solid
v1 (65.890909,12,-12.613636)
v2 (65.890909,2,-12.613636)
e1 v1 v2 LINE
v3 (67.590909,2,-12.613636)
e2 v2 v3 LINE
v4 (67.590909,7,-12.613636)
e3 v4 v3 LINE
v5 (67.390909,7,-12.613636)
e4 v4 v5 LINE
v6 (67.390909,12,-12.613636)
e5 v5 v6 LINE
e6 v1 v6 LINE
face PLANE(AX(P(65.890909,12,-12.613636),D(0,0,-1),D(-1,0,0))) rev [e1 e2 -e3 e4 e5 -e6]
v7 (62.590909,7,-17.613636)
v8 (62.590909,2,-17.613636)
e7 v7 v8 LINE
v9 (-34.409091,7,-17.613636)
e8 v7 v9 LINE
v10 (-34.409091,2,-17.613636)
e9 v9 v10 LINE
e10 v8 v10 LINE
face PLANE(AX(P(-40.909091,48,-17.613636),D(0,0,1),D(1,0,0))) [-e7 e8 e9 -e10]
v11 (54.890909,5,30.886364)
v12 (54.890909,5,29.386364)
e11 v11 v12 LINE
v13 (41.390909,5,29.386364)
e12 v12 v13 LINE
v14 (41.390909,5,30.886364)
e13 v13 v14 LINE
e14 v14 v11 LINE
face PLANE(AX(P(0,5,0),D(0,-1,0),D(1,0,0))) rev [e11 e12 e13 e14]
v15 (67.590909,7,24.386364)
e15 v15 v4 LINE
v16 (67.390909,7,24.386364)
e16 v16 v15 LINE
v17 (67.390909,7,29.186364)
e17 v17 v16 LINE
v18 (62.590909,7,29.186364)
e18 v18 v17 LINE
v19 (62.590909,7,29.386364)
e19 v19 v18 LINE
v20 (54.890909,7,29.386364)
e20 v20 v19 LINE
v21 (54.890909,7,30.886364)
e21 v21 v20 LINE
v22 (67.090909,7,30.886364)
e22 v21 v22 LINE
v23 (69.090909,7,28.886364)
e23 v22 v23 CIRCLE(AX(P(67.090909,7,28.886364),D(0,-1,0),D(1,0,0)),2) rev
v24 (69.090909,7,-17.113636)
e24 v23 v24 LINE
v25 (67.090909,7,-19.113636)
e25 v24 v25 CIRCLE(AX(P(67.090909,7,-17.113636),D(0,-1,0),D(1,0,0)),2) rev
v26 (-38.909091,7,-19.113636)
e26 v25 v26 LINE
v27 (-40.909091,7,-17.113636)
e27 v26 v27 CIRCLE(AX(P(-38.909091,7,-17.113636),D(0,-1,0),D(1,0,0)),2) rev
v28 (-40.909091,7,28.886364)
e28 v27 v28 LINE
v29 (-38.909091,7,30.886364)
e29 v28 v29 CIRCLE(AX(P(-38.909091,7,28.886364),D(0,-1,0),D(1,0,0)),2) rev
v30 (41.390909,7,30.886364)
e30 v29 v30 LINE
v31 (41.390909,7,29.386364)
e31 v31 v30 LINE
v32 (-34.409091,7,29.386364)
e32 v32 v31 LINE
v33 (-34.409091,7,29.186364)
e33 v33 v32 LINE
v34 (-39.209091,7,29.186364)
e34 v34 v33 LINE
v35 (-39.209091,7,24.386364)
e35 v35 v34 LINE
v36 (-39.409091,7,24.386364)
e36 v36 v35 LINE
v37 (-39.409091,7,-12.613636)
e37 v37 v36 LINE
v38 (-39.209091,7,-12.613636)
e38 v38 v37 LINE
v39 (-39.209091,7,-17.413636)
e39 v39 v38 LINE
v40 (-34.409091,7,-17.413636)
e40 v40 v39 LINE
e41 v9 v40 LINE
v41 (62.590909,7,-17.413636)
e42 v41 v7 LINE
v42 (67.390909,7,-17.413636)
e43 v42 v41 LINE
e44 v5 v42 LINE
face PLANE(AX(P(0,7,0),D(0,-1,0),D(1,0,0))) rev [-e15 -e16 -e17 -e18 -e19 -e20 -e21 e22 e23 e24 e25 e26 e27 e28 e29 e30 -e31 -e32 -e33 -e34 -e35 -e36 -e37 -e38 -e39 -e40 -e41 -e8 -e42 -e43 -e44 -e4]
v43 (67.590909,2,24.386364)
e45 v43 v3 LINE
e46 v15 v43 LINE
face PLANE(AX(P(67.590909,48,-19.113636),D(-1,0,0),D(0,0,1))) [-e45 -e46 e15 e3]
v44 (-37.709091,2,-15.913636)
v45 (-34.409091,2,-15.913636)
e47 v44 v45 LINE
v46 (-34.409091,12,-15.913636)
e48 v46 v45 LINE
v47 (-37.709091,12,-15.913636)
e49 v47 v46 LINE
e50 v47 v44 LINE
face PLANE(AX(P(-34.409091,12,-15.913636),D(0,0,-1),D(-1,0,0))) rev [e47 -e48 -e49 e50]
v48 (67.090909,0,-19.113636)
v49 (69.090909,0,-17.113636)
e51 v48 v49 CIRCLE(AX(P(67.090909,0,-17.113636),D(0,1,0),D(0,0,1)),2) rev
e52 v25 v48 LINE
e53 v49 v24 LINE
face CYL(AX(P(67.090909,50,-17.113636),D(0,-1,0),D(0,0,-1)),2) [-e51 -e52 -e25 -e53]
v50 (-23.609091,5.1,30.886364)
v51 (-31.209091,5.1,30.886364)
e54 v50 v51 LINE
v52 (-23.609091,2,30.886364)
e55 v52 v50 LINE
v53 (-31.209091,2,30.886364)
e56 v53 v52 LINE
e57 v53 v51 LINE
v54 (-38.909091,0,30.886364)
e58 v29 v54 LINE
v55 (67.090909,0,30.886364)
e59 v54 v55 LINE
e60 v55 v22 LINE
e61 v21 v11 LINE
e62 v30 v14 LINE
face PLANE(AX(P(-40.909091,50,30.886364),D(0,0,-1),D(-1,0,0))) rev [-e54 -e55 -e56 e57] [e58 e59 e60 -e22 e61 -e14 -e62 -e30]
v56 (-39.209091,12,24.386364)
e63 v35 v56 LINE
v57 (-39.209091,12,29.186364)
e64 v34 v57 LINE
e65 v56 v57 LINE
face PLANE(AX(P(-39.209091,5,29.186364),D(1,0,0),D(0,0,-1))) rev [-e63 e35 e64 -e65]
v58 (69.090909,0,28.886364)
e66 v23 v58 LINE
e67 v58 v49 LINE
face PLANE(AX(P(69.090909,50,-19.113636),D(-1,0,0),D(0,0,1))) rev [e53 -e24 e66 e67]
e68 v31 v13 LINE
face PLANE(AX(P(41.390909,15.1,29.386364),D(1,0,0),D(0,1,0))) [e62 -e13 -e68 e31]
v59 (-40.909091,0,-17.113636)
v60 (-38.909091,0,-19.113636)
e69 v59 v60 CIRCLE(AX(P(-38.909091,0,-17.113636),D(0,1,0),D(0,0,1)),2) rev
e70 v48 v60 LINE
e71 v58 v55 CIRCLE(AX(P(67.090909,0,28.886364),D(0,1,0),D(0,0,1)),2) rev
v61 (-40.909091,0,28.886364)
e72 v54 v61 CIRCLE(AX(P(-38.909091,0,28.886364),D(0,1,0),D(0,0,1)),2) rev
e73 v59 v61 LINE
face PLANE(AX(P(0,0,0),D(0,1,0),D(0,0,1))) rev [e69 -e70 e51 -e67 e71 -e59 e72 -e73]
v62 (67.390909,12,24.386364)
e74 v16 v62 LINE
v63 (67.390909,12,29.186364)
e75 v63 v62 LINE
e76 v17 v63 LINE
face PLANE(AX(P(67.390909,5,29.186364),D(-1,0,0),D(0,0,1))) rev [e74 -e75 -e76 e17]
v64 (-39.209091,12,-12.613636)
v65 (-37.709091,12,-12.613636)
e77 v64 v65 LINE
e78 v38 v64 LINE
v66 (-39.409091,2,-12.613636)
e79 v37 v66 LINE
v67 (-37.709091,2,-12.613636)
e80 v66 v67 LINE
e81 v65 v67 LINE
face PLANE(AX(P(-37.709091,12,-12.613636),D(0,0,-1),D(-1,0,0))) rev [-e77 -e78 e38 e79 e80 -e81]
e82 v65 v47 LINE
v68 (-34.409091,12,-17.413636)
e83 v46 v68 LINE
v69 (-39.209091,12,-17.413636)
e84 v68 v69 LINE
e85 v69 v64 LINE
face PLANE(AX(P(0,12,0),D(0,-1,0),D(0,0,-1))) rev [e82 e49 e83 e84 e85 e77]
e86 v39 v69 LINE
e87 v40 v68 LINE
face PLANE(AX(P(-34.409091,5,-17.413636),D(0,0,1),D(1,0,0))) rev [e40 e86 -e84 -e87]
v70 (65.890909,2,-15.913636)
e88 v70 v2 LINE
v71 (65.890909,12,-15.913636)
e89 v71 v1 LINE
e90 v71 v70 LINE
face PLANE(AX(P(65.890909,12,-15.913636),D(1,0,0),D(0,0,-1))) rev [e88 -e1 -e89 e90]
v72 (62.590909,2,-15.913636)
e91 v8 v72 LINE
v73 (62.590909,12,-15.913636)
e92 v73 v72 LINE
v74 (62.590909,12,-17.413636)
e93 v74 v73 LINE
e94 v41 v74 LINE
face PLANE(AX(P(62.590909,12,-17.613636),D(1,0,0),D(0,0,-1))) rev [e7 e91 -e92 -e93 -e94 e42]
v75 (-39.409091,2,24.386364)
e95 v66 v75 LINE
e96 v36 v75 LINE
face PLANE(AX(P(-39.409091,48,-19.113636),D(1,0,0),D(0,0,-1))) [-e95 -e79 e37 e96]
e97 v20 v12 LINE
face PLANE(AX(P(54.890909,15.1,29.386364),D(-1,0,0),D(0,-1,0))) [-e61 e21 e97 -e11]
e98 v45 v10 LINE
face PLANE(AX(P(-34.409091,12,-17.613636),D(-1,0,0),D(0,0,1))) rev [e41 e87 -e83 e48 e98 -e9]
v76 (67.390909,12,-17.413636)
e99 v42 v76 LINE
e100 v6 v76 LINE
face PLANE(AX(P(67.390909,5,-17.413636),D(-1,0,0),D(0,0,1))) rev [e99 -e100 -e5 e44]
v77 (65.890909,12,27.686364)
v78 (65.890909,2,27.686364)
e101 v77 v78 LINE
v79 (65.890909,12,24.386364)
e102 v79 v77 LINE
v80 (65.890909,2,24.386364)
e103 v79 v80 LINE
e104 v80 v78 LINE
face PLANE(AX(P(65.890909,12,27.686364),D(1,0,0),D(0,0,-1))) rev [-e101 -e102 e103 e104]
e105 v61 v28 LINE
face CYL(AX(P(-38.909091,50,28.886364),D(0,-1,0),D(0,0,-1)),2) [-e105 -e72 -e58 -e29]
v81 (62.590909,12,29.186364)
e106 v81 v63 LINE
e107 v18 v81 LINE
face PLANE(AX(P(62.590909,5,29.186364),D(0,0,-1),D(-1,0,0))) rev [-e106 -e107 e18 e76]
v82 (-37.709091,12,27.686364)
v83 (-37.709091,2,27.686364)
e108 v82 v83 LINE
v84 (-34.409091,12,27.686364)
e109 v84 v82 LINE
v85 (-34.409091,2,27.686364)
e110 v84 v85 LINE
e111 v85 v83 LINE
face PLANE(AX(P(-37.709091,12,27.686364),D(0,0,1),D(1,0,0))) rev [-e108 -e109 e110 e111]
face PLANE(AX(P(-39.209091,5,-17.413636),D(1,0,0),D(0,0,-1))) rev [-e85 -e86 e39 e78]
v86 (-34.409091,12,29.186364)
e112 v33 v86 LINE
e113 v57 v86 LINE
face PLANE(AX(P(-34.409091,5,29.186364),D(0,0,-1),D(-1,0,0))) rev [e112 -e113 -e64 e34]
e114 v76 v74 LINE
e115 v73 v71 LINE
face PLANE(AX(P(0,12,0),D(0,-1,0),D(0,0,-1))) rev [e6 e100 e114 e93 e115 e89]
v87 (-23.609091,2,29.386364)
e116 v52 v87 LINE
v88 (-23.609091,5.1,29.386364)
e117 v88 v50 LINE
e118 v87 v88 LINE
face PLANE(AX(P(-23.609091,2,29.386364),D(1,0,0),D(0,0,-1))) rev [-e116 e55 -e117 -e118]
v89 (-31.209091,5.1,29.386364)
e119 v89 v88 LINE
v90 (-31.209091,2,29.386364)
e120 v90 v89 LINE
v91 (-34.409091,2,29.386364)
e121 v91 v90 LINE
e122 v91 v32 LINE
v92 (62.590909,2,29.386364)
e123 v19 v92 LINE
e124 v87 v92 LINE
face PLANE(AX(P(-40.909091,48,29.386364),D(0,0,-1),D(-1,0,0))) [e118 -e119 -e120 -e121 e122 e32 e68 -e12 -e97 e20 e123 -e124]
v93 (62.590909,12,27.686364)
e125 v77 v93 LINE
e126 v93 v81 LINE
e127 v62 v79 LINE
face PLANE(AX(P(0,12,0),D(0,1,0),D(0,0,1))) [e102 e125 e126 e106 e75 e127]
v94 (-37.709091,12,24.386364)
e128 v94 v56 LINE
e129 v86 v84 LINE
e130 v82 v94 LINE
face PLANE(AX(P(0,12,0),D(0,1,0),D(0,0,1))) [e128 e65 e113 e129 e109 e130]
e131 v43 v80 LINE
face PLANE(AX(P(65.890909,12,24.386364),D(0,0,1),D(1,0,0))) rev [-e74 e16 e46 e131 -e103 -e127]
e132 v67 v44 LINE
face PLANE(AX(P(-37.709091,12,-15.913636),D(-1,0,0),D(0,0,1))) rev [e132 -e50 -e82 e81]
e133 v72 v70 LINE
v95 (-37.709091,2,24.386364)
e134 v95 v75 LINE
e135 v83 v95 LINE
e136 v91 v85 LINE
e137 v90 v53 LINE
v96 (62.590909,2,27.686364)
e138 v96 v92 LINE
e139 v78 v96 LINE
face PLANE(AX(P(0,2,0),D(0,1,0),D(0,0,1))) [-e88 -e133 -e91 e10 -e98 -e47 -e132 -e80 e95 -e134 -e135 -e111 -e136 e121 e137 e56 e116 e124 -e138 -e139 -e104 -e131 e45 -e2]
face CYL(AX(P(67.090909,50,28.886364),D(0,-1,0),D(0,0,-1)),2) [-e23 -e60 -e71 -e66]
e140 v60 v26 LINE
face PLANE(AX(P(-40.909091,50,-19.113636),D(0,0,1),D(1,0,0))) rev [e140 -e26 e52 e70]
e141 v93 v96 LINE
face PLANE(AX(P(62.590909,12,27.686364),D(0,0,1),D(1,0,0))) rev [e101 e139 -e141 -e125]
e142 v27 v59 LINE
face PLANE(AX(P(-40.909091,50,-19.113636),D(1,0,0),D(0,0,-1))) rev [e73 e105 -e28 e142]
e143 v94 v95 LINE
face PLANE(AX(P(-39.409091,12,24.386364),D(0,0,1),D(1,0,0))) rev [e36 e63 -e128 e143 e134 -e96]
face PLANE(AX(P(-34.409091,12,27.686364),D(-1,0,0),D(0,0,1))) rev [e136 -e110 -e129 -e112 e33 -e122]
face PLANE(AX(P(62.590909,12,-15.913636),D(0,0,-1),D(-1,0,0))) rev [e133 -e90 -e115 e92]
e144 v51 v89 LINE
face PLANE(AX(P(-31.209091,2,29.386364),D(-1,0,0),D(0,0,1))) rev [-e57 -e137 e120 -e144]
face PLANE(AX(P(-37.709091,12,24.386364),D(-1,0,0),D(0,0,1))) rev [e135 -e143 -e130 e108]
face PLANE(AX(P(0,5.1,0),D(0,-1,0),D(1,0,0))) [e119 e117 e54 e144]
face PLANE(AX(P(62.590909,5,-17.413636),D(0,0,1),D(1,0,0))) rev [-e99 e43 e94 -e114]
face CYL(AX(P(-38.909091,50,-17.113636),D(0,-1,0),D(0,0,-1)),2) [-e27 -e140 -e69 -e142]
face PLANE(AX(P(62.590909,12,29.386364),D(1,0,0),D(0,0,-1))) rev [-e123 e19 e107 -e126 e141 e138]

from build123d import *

# Parameters (mm, degrees)
STOCK_FULL_SHAPE_1_OUTLINE_W     = 110
STOCK_FULL_SHAPE_1_OUTLINE_H     = 50
STOCK_FULL_SHAPE_1_DEPTH         = 2
STOCK_FULL_START                 = 2
STOCK_FULL_SHAPE_1_2_OUTLINE_W   = 110
STOCK_FULL_SHAPE_1_2_OUTLINE_H   = 50
STOCK_FULL_SHAPE_1_2_OUTLINE_W_2 = 107
STOCK_FULL_SHAPE_1_2_OUTLINE_H_2 = 47
STOCK_FULL_SHAPE_1_2_DEPTH       = 3
BOSS_EXTRUDE1_DEPTH              = 10
BOSS_EXTRUDE2_DEPTH              = 10
BOSS_EXTRUDE3_DEPTH              = 10
BOSS_EXTRUDE4_DEPTH              = 10
CUT_EXTRUDE3_DEPTH               = 7
SKETCH9_W                        = 106.6
SKETCH9_H                        = 2
CUT_EXTRUDE4_DEPTH               = 87
SKETCH10_W                       = 7.6
SKETCH10_H                       = 1.5
CUT_EXTRUDE5_DEPTH               = 3
SKETCH11_W                       = 110
SKETCH11_H                       = 50
BOSS_EXTRUDE5_DEPTH              = 2
BOSS_EXTRUDE6_DEPTH              = 2
SKETCH13_W                       = 7.6
SKETCH13_H                       = 1.5
CUT_EXTRUDE6_DEPTH               = 0.1
SKETCH1_W                        = 13.5
SKETCH1_H                        = 1.5
CUT_EXTRUDE7_DEPTH               = 10.1
FILLET1_R                        = 2


# Read off the part's stored shape, not the designer's step: Stock-full shape-1
with BuildPart() as part:
    # Stock-full shape-1 outline → Stock-full shape-1 (new body)
    with BuildSketch(Plane(origin=(0, 0, 0), x_dir=(1, 0, 0), z_dir=(0, 1, 0))):
        with Locations((14.090909091, -5.886363636)):
            Rectangle(STOCK_FULL_SHAPE_1_OUTLINE_W, STOCK_FULL_SHAPE_1_OUTLINE_H)
    extrude(amount=STOCK_FULL_SHAPE_1_DEPTH)

    # Stock-full shape-1 2 outline → Stock-full shape-1 2 (add)
    with BuildSketch(Plane(origin=(0, 0, 0), x_dir=(1, 0, 0), z_dir=(0, 1, 0)).offset(STOCK_FULL_START)):
        with Locations((14.090909091, -5.886363636)):
            Rectangle(STOCK_FULL_SHAPE_1_2_OUTLINE_W, STOCK_FULL_SHAPE_1_2_OUTLINE_H)
        with Locations((14.090909091, -5.886363636)):
            Rectangle(STOCK_FULL_SHAPE_1_2_OUTLINE_W_2, STOCK_FULL_SHAPE_1_2_OUTLINE_H_2, mode=Mode.SUBTRACT)
    extrude(amount=STOCK_FULL_SHAPE_1_2_DEPTH)

    # Sketch4 → Boss-Extrude1 (add)
    with BuildSketch(Plane(origin=(0, 2, 0), x_dir=(1, 0, 0), z_dir=(0, 1, 0))):
        Polygon((-39.409090909, 12.824440082), (-39.409090909, 17.613636364), (-34.409090909, 17.613636364), (-34.409090909, 15.913636364), (-37.709090909, 15.913636364), (-37.709090909, 12.613636364), (-39.409090909, 12.613636364), align=None)
    extrude(amount=BOSS_EXTRUDE1_DEPTH)

    # Sketch5 → Boss-Extrude2 (add)
    with BuildSketch(Plane(origin=(0, 2, 0), x_dir=(1, 0, 0), z_dir=(0, 1, 0))):
        Polygon((-39.409090909, -29.386363636), (-39.409090909, -24.386363636), (-37.709090909, -24.386363636), (-37.709090909, -27.686363636), (-34.409090909, -27.686363636), (-34.409090909, -29.386363636), align=None)
    extrude(amount=BOSS_EXTRUDE2_DEPTH)

    # Sketch6 → Boss-Extrude3 (add)
    with BuildSketch(Plane(origin=(0, 2, 0), x_dir=(1, 0, 0), z_dir=(0, 1, 0))):
        Polygon((67.590909091, 17.613636364), (62.590909091, 17.613636364), (62.590909091, 15.913636364), (65.890909091, 15.913636364), (65.890909091, 12.613636364), (67.590909091, 12.613636364), align=None)
    extrude(amount=BOSS_EXTRUDE3_DEPTH)

    # Sketch7 → Boss-Extrude4 (add)
    with BuildSketch(Plane(origin=(0, 2, 0), x_dir=(1, 0, 0), z_dir=(0, 1, 0))):
        Polygon((67.590909091, -24.386363636), (67.590909091, -29.386363636), (62.590909091, -29.386363636), (62.590909091, -27.686363636), (65.890909091, -27.686363636), (65.890909091, -24.386363636), align=None)
    extrude(amount=BOSS_EXTRUDE4_DEPTH)

    # Sketch8 → Cut-Extrude3 (cut)
    with BuildSketch(Plane(origin=(0, 12, 0), x_dir=(1, 0, 0), z_dir=(0, 1, 0))):
        Polygon((62.590909091, -29.386363636), (62.590909091, -29.186363636), (67.390909091, -29.186363636), (67.390909091, -24.386363636), (67.590909091, -24.386363636), (67.590909091, -29.386363636), align=None)
        Polygon((62.590909091, 17.613636364), (62.590909091, 17.413636364), (67.390909091, 17.413636364), (67.390909091, 12.613636364), (67.590909091, 12.613636364), (67.590909091, 17.613636364), align=None)
        Polygon((-39.409090909, 12.613636364), (-39.409090909, 17.613636364), (-34.409090909, 17.613636364), (-34.409090909, 17.413636364), (-39.209090909, 17.413636364), (-39.209090909, 12.613636364), align=None)
        Polygon((-39.409090909, -24.386363636), (-39.409090909, -29.386363636), (-34.409090909, -29.386363636), (-34.409090909, -29.186363636), (-39.209090909, -29.186363636), (-39.209090909, -24.386363636), align=None)
    extrude(amount=-CUT_EXTRUDE3_DEPTH, mode=Mode.SUBTRACT)

    # Sketch9 → Cut-Extrude4 (cut)
    with BuildSketch(Plane.XY.offset(29.186363636)):
        with Locations((14.090909091, 11)):
            Rectangle(SKETCH9_W, SKETCH9_H)
    extrude(amount=-CUT_EXTRUDE4_DEPTH, mode=Mode.SUBTRACT)

    # Sketch10 → Cut-Extrude5 (cut)
    with BuildSketch(Plane(origin=(0, 5, 0), x_dir=(1, 0, 0), z_dir=(0, 1, 0))):
        with Locations((-27.409090909, -30.136363636)):
            Rectangle(SKETCH10_W, SKETCH10_H)
    extrude(amount=-CUT_EXTRUDE5_DEPTH, mode=Mode.SUBTRACT)

    # Sketch11 → Boss-Extrude5 (add)
    with BuildSketch(Plane(origin=(0, 5, 0), x_dir=(1, 0, 0), z_dir=(0, 1, 0))):
        with Locations((14.090909091, -5.886363636)):
            Rectangle(SKETCH11_W, SKETCH11_H)
        Polygon((-39.209090909, 17.413636364), (-39.209090909, 12.613636364), (-39.409090909, 12.613636364), (-39.409090909, -24.386363636), (-39.209090909, -24.386363636), (-39.209090909, -29.186363636), (-34.409090909, -29.186363636), (-34.409090909, -29.386363636), (-31.209090909, -29.386363636), (62.590909091, -29.386363636), (62.590909091, -29.186363636), (67.390909091, -29.186363636), (67.390909091, -24.386363636), (67.590909091, -24.386363636), (67.590909091, 12.613636364), (67.390909091, 12.613636364), (67.390909091, 17.413636364), (62.590909091, 17.413636364), (62.590909091, 17.613636364), (-34.409090909, 17.613636364), (-34.409090909, 17.413636364), align=None, mode=Mode.SUBTRACT)
    extrude(amount=BOSS_EXTRUDE5_DEPTH)

    # Sketch12 → Boss-Extrude6 (add)
    with BuildSketch(Plane(origin=(0, 10, 0), x_dir=(1, 0, 0), z_dir=(0, 1, 0))):
        Polygon((-37.709090909, -24.386363636), (-39.209090909, -24.386363636), (-39.209090909, -29.186363636), (-34.409090909, -29.186363636), (-34.409090909, -27.686363636), (-37.709090909, -27.686363636), align=None)
        Polygon((62.590909091, -29.186363636), (67.390909091, -29.186363636), (67.390909091, -24.386363636), (65.890909091, -24.386363636), (65.890909091, -27.686363636), (62.590909091, -27.686363636), align=None)
        Polygon((67.390909091, 12.613636364), (65.890909091, 12.613636364), (65.890909091, 15.913636364), (62.590909091, 15.913636364), (62.590909091, 17.413636364), (67.390909091, 17.413636364), align=None)
        Polygon((-37.709090909, 12.613636364), (-39.209090909, 12.613636364), (-39.209090909, 17.413636364), (-34.409090909, 17.413636364), (-34.409090909, 15.913636364), (-37.709090909, 15.913636364), align=None)
    extrude(amount=BOSS_EXTRUDE6_DEPTH)

    # Sketch13 → Cut-Extrude6 (cut)
    with BuildSketch(Plane.XZ.offset(-5)):
        with Locations((-27.409090909, 30.136363636)):
            Rectangle(SKETCH13_W, SKETCH13_H)
    extrude(amount=-CUT_EXTRUDE6_DEPTH, mode=Mode.SUBTRACT)

    # Sketch1 → Cut-Extrude7 (cut)
    with BuildSketch(Plane(origin=(0, 5, 0), x_dir=(1, 0, 0), z_dir=(0, 1, 0))):
        with Locations((48.140909091, -30.136363636)):
            Rectangle(SKETCH1_W, SKETCH1_H)
    extrude(amount=CUT_EXTRUDE7_DEPTH, mode=Mode.SUBTRACT)

    # Fillet1
    fillet1_edges = [part.edges().sort_by_distance(p)[0] for p in [
        (-40.909090909, 2.5, -19.113636364),
        (69.090909091, 2.5, -19.113636364),
        (69.090909091, 2.5, 30.886363636),
        (-40.909090909, 2.5, 30.886363636),
    ]]
    fillet(fillet1_edges, radius=FILLET1_R)


solid = part.part
